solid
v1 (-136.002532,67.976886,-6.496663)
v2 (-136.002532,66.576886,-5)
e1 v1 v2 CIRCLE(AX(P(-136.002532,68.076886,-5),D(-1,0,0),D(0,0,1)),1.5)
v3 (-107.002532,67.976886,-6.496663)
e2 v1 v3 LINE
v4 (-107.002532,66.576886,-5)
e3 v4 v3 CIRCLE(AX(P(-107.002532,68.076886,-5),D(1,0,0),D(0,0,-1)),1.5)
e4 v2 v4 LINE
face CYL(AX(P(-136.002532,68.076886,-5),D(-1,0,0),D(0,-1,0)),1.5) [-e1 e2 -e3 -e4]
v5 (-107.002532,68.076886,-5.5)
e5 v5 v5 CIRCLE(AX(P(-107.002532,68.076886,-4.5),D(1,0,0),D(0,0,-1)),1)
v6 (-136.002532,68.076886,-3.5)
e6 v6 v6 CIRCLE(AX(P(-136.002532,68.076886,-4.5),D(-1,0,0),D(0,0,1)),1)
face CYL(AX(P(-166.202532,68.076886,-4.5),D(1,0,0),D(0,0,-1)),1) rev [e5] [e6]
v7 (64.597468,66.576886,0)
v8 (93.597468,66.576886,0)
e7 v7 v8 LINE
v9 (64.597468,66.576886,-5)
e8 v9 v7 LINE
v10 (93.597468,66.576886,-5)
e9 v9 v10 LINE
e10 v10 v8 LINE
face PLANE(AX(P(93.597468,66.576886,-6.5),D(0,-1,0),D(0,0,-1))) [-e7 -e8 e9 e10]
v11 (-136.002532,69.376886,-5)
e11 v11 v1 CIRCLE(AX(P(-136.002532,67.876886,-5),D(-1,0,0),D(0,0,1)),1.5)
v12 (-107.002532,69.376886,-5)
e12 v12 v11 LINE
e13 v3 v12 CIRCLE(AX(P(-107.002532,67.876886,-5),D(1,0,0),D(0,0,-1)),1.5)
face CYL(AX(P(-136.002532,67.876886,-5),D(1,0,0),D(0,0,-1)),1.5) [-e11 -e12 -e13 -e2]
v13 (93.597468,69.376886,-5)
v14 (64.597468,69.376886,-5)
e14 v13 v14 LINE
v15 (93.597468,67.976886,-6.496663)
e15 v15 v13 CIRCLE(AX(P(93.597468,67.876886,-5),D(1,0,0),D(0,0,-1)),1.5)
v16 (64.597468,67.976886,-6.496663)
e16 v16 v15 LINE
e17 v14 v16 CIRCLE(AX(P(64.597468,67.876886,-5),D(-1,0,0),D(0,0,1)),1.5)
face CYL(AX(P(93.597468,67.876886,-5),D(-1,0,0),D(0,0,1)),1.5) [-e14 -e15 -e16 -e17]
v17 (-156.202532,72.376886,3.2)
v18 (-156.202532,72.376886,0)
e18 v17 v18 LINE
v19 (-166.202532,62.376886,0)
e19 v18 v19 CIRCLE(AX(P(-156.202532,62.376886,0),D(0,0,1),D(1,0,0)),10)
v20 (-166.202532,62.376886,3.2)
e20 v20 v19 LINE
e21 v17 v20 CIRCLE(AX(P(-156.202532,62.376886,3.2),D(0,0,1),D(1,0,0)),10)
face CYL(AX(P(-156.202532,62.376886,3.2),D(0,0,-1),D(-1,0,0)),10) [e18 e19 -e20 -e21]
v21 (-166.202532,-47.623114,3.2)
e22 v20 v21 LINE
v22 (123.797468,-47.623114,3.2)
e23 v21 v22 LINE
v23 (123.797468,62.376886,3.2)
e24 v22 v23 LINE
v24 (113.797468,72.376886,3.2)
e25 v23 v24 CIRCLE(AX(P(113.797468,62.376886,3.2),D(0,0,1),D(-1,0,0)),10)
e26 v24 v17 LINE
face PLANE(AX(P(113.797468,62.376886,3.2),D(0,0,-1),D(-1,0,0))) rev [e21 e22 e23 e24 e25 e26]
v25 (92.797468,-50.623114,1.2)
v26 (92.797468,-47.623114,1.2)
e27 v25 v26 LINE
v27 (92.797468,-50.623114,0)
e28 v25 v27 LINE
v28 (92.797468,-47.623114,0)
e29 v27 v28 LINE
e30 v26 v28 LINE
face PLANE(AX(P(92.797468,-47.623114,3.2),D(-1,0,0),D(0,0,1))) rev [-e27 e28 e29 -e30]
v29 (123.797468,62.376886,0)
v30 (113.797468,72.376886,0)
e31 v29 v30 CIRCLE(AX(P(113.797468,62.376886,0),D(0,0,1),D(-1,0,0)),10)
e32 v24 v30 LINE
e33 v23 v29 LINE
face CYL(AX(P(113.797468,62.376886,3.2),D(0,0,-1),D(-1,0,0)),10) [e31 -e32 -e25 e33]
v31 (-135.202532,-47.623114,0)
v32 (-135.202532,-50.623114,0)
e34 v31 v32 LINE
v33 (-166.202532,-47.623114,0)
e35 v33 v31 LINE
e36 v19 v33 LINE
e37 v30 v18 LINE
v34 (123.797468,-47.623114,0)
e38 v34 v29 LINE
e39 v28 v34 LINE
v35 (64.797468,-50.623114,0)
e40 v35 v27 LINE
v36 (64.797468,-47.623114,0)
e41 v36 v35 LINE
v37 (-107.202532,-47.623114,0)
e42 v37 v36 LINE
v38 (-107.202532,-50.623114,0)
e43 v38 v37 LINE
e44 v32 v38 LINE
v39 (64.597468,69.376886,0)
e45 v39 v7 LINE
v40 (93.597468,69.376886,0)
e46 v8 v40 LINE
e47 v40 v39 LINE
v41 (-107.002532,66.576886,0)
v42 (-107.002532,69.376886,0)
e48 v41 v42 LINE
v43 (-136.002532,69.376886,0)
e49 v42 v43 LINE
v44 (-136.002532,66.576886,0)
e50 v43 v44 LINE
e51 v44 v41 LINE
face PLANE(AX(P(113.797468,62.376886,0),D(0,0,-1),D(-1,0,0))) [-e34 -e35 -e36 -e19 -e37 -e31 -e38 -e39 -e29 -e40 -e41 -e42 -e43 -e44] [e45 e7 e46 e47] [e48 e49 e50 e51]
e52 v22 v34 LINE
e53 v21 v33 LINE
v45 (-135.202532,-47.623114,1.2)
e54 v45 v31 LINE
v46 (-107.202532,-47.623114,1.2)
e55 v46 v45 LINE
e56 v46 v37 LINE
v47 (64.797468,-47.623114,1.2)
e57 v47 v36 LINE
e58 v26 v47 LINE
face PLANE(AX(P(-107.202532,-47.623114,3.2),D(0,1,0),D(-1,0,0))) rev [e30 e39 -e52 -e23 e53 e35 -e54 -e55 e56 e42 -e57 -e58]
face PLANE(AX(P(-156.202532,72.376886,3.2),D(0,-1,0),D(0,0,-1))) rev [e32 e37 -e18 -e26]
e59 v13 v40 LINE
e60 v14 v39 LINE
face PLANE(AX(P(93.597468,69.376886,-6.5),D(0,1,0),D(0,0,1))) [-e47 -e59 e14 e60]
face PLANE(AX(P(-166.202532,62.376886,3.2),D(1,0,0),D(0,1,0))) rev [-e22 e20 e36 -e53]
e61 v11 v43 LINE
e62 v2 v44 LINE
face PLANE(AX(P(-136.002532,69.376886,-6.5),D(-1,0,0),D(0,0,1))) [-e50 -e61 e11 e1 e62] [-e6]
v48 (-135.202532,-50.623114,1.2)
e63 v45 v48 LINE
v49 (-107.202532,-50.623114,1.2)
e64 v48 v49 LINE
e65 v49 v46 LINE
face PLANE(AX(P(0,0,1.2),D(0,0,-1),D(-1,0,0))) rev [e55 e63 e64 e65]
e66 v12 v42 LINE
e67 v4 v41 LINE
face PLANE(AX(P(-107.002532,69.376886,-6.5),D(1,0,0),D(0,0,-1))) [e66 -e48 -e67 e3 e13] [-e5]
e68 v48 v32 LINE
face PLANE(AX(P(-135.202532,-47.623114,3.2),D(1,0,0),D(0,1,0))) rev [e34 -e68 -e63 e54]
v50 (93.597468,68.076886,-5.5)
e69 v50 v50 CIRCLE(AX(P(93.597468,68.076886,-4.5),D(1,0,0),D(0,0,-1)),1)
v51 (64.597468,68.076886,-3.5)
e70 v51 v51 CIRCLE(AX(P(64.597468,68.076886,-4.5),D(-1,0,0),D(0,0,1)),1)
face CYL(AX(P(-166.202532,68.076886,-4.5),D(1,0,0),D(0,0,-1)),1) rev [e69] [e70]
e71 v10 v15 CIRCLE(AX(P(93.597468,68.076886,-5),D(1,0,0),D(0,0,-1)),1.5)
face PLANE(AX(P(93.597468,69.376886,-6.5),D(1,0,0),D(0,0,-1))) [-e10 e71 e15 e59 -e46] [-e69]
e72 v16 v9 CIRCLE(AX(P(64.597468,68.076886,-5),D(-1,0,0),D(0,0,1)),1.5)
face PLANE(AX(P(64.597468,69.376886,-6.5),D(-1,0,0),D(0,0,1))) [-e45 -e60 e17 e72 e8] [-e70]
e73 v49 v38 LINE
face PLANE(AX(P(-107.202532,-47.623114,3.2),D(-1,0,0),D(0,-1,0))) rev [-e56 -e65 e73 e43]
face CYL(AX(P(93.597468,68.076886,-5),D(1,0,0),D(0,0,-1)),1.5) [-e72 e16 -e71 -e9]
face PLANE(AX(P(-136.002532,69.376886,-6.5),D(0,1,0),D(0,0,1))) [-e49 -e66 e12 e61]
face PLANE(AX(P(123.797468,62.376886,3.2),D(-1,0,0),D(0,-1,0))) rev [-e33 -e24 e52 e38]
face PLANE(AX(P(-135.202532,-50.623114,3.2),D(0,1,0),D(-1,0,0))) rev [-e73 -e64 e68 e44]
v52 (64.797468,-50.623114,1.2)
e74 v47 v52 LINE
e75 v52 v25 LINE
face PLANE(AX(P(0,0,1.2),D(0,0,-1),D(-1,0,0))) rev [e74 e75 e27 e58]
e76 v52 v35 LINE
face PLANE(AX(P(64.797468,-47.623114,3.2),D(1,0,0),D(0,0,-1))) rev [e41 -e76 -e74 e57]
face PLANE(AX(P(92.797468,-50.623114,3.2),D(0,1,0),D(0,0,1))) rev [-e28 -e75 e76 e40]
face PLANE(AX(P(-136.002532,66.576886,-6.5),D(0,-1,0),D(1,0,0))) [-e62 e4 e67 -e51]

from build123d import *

# Parameters (mm, degrees)
EXTRUDE_1_DEPTH     = 3.2
SKETCH_2_W          = 28
SKETCH_2_H          = 3
CUT_EXTRUDE_1_DEPTH = 2
SKETCH_3_W          = 29
SKETCH_3_H          = 2.8
EXTRUDE_2_DEPTH     = 6.5
SKETCH_4_R          = 1
CUT_EXTRUDE_2_DEPTH = 270.771576627
FILLET_1_R          = 1.5


with BuildPart() as part:
    # 草图1 → 凸台-拉伸1 (new body)
    with BuildSketch(Plane.XY):
        with BuildLine():
            Line((-107.202531646, -47.623114492), (64.797468354, -47.623114492))
            Line((64.797468354, -47.623114492), (64.797468354, -50.623114492))
            Line((64.797468354, -50.623114492), (92.797468354, -50.623114492))
            Line((92.797468354, -50.623114492), (92.797468354, -47.623114492))
            Line((92.797468354, -47.623114492), (123.797468354, -47.623114492))
            Line((123.797468354, -47.623114492), (123.797468354, 62.376885508))
            ThreePointArc((123.797468354, 62.376885508), (120.868536166, 69.447953319), (113.797468354, 72.376885508))
            Line((113.797468354, 72.376885508), (-156.202531646, 72.376885508))
            ThreePointArc((-156.202531646, 72.376885508), (-163.273599457, 69.447953319), (-166.202531646, 62.376885508))
            Line((-166.202531646, 62.376885508), (-166.202531646, -47.623114492))
            Line((-166.202531646, -47.623114492), (-135.202531646, -47.623114492))
            Line((-135.202531646, -47.623114492), (-135.202531646, -50.623114492))
            Line((-135.202531646, -50.623114492), (-107.202531646, -50.623114492))
            Line((-107.202531646, -50.623114492), (-107.202531646, -47.623114492))
        make_face()
    extrude(amount=EXTRUDE_1_DEPTH)

    # 草图2 → 切除-拉伸1 (cut)
    with BuildSketch(Plane.XY.offset(3.2)):
        with Locations((-121.202531646, -49.123114492)):
            Rectangle(SKETCH_2_W, SKETCH_2_H)
        with Locations((78.797468354, -49.123114492)):
            Rectangle(SKETCH_2_W, SKETCH_2_H)
    extrude(amount=-CUT_EXTRUDE_1_DEPTH, mode=Mode.SUBTRACT)

    # 草图3 → 凸台-拉伸2 (add)
    with BuildSketch(Plane.XY):
        with Locations((-121.502531646, 67.976885508)):
            Rectangle(SKETCH_3_W, SKETCH_3_H)
        with Locations((79.097468354, 67.976885508)):
            Rectangle(SKETCH_3_W, SKETCH_3_H)
    extrude(amount=-EXTRUDE_2_DEPTH)

    # 草图4 → 切除-拉伸2 (cut, through all)
    with BuildSketch(Plane(origin=(93.597468354, 0, 0), x_dir=(0, 0, -1), z_dir=(1, 0, 0))):
        with Locations((4.5, 68.076885508)):
            Circle(SKETCH_4_R)
    extrude(amount=-CUT_EXTRUDE_2_DEPTH, mode=Mode.SUBTRACT)

    # 圆角1
    # the kernel refuses this fillet: 1.5 mm, written as the material it takes off along each edge
    with BuildSketch(Plane(origin=(60.847468354, 66.576885508, -6.5), x_dir=(0, 0, 1), z_dir=(1, 0, 0)), Plane(origin=(97.347468354, 69.376885508, -6.5), x_dir=(0, 0, 1), z_dir=(-1, 0, 0))) as fillet_1_piece_1:
        with BuildLine():
            CenterArc((FILLET_1_R, -FILLET_1_R), FILLET_1_R, 90, 90)
            Line((0, -FILLET_1_R), (0, 0))
            Line((0, 0), (FILLET_1_R, 0))
        make_face()
    extrude(amount=36.5, mode=Mode.SUBTRACT)
    with BuildSketch(Plane(origin=(-103.252531646, 66.576885508, -6.5), x_dir=(0, 0, 1), z_dir=(-1, 0, 0)), Plane(origin=(-139.752531646, 69.376885508, -6.5), x_dir=(0, 0, 1), z_dir=(1, 0, 0))) as fillet_1_piece_2:
        with BuildLine():
            CenterArc((FILLET_1_R, FILLET_1_R), FILLET_1_R, 180, 90)
            Line((0, FILLET_1_R), (0, 0))
            Line((0, 0), (FILLET_1_R, 0))
        make_face()
    extrude(amount=36.5, mode=Mode.SUBTRACT)


solid = part.part
